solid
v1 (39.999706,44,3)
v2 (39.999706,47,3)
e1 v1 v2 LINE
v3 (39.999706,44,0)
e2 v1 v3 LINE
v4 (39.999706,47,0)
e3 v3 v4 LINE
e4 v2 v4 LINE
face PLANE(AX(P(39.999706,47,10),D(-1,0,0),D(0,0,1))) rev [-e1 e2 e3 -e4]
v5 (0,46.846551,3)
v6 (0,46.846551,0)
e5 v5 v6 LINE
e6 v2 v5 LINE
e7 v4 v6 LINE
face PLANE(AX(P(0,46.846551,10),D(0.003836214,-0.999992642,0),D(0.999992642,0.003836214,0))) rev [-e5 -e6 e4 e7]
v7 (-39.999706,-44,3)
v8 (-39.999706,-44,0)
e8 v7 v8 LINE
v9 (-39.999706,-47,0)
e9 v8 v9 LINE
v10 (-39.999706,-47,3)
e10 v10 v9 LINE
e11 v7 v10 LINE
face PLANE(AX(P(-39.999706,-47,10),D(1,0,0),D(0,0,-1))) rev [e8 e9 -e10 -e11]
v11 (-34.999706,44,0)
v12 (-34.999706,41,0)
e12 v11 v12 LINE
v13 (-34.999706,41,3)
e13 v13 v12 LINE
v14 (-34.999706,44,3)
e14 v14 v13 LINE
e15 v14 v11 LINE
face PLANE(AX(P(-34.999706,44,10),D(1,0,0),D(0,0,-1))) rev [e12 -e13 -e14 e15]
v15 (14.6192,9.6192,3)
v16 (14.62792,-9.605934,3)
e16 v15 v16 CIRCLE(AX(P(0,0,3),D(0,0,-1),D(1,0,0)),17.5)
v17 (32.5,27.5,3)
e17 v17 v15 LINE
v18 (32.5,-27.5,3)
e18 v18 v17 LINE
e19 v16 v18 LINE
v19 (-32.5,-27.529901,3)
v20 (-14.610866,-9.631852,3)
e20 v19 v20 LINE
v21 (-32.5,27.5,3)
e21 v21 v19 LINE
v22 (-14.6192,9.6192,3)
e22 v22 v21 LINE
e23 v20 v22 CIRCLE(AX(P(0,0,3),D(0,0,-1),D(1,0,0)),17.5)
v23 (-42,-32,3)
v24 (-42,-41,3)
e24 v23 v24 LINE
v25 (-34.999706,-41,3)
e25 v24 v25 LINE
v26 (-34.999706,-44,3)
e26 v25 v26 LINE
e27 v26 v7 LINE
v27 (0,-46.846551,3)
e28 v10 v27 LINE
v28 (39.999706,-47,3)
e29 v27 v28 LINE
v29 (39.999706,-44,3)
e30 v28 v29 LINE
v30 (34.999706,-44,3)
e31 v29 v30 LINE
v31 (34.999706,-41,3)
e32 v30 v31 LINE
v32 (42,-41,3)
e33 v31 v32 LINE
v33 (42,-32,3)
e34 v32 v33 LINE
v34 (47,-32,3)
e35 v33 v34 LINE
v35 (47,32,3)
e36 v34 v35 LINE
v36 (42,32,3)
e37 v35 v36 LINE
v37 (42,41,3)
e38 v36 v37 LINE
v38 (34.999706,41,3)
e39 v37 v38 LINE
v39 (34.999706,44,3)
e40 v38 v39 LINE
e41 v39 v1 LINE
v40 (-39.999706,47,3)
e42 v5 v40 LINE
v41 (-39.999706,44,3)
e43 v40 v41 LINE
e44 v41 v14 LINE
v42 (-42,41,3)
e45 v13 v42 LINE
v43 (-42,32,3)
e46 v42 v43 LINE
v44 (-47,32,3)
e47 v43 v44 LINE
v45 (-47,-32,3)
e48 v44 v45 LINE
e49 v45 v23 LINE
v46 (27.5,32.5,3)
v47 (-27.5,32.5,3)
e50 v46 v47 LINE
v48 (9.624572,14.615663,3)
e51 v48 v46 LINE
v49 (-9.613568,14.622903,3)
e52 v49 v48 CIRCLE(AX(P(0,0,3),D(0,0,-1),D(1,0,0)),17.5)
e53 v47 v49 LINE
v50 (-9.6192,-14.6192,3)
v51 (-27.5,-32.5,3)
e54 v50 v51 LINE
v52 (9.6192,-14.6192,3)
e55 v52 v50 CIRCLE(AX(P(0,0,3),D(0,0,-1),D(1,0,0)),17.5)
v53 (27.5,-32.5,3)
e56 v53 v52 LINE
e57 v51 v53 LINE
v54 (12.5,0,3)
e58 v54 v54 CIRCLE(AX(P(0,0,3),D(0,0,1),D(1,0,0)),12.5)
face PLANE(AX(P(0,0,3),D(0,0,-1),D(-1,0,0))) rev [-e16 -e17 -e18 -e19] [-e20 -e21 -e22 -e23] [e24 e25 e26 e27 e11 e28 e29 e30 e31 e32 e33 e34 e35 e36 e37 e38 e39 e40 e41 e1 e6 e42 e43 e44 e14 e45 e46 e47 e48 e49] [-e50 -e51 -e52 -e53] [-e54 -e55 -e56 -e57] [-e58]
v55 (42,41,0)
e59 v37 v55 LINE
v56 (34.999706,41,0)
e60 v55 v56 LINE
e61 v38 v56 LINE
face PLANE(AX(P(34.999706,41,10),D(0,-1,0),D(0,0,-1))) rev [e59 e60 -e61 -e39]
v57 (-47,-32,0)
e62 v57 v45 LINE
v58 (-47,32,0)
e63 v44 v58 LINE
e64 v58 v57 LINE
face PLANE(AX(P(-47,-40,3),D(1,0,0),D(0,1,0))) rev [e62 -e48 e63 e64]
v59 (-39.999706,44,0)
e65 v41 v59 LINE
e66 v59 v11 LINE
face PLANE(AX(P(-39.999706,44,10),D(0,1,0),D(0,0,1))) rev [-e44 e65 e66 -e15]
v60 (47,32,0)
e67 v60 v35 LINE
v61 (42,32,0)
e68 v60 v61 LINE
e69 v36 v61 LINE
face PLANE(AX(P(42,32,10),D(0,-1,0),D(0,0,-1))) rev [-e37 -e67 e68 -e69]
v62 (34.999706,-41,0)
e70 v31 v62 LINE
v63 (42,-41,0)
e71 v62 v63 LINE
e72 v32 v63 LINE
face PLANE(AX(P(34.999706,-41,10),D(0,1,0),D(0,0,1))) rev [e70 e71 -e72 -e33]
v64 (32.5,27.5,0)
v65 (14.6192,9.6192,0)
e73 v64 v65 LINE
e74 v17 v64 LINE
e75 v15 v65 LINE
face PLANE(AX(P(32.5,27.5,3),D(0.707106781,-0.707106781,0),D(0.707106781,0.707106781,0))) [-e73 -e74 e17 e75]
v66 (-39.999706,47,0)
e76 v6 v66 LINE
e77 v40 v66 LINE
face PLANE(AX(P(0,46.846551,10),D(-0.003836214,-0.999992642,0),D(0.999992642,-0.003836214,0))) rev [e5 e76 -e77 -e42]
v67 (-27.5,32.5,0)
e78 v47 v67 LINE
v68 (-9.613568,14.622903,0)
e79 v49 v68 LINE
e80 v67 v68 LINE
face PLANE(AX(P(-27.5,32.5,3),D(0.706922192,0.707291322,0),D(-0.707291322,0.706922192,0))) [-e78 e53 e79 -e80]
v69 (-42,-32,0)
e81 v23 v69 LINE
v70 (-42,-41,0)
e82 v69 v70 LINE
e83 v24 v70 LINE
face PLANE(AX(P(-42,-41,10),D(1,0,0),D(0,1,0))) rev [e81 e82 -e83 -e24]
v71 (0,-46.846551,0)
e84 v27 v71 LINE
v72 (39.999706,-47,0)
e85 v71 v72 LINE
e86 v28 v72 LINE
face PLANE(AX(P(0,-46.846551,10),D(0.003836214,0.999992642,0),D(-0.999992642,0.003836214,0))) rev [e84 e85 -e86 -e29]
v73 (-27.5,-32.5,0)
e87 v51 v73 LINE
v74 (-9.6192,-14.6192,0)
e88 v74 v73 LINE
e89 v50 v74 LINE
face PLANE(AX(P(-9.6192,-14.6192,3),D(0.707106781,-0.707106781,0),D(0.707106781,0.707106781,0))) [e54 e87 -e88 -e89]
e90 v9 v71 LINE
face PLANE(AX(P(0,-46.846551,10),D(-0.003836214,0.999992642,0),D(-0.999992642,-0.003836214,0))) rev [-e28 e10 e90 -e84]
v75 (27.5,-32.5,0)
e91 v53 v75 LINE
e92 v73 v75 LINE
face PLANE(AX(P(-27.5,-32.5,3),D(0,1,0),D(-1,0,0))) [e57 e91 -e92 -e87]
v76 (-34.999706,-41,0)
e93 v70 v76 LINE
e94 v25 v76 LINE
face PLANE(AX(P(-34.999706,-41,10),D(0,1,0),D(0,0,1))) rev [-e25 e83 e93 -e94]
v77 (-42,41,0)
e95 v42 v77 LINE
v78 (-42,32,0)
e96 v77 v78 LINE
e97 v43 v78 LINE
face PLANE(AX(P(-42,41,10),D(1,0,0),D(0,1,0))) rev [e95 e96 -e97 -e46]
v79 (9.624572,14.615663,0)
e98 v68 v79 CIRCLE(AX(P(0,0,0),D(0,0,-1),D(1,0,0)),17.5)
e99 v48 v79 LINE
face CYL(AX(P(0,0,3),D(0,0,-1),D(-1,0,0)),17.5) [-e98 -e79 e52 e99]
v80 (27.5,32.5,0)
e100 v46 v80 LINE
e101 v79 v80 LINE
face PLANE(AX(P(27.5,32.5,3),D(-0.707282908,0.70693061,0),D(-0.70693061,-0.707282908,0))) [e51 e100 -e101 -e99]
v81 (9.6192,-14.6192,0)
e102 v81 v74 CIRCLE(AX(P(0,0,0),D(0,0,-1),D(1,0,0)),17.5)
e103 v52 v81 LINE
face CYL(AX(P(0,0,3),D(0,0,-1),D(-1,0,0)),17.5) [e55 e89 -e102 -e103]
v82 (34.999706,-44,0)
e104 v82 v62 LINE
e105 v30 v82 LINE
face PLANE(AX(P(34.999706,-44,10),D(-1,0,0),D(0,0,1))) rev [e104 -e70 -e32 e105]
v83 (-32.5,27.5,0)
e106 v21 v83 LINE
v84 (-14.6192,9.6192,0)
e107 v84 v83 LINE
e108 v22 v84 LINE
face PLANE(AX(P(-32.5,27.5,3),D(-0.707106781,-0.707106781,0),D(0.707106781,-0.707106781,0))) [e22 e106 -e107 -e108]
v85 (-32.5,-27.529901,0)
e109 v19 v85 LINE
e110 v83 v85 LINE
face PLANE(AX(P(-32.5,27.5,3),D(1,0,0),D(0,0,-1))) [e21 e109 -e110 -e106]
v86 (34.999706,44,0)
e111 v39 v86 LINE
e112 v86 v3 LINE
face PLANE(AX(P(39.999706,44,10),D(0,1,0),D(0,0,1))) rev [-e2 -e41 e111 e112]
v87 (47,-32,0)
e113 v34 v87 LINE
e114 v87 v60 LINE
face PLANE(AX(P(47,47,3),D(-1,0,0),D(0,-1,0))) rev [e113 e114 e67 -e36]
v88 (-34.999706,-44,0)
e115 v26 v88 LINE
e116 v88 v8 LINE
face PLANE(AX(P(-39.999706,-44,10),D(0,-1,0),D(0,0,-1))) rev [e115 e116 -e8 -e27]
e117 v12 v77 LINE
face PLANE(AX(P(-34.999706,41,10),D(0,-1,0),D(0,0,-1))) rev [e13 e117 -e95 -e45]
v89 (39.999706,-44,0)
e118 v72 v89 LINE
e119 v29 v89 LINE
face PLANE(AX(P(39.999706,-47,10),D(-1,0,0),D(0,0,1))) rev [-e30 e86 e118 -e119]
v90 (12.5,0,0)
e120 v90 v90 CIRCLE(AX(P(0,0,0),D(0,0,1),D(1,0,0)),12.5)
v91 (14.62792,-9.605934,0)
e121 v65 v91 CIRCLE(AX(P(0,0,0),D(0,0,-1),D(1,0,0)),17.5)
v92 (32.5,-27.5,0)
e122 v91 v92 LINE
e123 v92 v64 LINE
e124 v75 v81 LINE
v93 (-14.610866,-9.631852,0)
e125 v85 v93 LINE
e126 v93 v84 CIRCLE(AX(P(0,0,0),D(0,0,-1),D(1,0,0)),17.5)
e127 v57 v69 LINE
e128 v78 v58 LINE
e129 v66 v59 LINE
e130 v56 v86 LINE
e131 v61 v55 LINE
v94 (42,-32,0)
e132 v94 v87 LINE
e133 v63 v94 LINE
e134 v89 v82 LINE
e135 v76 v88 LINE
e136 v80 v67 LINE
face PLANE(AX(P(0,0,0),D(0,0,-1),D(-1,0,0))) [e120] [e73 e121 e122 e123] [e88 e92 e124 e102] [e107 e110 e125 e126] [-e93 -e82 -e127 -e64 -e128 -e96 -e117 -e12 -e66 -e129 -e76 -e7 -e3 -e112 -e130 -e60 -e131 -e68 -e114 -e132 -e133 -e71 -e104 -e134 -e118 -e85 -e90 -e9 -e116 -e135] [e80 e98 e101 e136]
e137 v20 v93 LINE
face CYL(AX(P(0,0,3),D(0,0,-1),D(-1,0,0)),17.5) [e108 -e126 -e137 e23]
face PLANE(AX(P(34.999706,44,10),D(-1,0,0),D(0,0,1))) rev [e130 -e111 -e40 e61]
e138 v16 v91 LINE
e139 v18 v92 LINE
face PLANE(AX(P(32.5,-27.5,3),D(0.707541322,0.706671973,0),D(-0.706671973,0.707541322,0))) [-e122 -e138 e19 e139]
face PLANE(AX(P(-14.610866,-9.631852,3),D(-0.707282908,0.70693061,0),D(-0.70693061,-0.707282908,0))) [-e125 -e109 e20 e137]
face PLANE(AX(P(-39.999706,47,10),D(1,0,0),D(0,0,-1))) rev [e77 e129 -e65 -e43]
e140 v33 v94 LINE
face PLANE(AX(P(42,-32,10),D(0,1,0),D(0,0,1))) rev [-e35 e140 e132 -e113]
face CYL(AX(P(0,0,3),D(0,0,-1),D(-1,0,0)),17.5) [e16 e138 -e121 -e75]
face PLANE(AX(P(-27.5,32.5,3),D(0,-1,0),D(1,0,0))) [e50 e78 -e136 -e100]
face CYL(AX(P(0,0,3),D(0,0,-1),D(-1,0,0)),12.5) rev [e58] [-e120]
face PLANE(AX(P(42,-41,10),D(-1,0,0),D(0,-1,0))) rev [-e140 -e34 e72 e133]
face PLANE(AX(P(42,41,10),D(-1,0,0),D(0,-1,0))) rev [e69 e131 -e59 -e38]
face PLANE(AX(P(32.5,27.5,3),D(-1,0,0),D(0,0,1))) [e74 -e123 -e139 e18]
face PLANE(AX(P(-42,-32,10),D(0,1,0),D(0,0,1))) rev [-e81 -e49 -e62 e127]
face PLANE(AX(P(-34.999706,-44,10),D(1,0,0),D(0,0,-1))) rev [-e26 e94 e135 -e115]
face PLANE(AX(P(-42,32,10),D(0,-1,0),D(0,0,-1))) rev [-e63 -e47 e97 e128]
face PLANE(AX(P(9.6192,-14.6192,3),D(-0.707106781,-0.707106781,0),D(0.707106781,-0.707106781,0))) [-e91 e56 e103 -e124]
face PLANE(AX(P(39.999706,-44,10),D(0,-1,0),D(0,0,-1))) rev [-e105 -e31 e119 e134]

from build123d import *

# Parameters (mm, degrees)
SKETCH1_R               = 12.5
BOSS_EXTRUDE4_DEPTH     = 3
CUT_EXTRUDE_THIN3_START = -3
CUT_EXTRUDE_THIN3_DEPTH = 3


# Read off the part's stored shape, not the designer's step: Cut-Extrude-Thin3
with BuildPart() as part:
    # Sketch1 → Boss-Extrude4 (new body)
    with BuildSketch(Plane.XY):
        Polygon((-40, 47), (40, 47), (47, 47), (47, 40), (47, -40), (47, -47), (40, -47), (-40, -47), (-47, -47), (-47, -40), (-47, 40), (-47, 47), align=None)
        Circle(SKETCH1_R, mode=Mode.SUBTRACT)
        with BuildLine():
            Line((-27.5, 32.5), (27.5, 32.5))
            Line((27.5, 32.5), (9.624571705, 14.615663498))
            ThreePointArc((9.624571705, 14.615663498), (0.00658569, 17.499998761), (-9.613568497, 14.622903294))
            Line((-9.613568497, 14.622903294), (-27.5, 32.5))
        make_face(mode=Mode.SUBTRACT)
        with BuildLine():
            Line((-32.5, 27.5), (-32.5, -27.529900959))
            Line((-32.5, -27.529900959), (-14.610866481, -9.631852402))
            ThreePointArc((-14.610866481, -9.631852402), (-17.49999836, -0.007575188), (-14.619199644, 9.619199644))
            Line((-14.619199644, 9.619199644), (-32.5, 27.5))
        make_face(mode=Mode.SUBTRACT)
        with BuildLine():
            Line((-27.5, -32.5), (27.5, -32.5))
            Line((27.5, -32.5), (9.619199644, -14.619199644))
            ThreePointArc((9.619199644, -14.619199644), (0, -17.5), (-9.619199644, -14.619199644))
            Line((-9.619199644, -14.619199644), (-27.5, -32.5))
        make_face(mode=Mode.SUBTRACT)
        with BuildLine():
            Line((32.5, 27.5), (14.619199644, 9.619199644))
            ThreePointArc((14.619199644, 9.619199644), (17.4999982, 0.007937724), (14.627919862, -9.60593361))
            Line((14.627919862, -9.60593361), (32.5, -27.5))
            Line((32.5, -27.5), (32.5, 27.5))
        make_face(mode=Mode.SUBTRACT)
    extrude(amount=BOSS_EXTRUDE4_DEPTH)

    # Cut-Extrude-Thin3 outline → Cut-Extrude-Thin3 (cut)
    with BuildSketch(Plane(origin=(0, 0, 0), x_dir=(-1, 0, 0), z_dir=(0, 0, -1)).offset(CUT_EXTRUDE_THIN3_START)):
        Polygon((-42, -41), (-42, -32), (-47, -32), (-47, -47), (-39.999705668, -47), (-39.999705668, -44), (-34.999705668, -44), (-34.999705668, -41), align=None)
        Polygon((-47, 47), (-47, 32), (-42, 32), (-42, 41), (-34.999705668, 41), (-34.999705668, 44), (-39.999705668, 44), (-39.999705668, 47), align=None)
        Polygon((0, -46.846551451), (-39.999705668, -47), (39.999705668, -47), align=None)
        Polygon((39.999705668, -44), (39.999705668, -47), (47, -47), (47, -32), (42, -32), (42, -41), (34.999705668, -41), (34.999705668, -44), align=None)
        Polygon((39.999705668, 47), (-39.999705668, 47), (0, 46.846551451), align=None)
        Polygon((47, 47), (39.999705668, 47), (39.999705668, 44), (34.999705668, 44), (34.999705668, 41), (42, 41), (42, 32), (47, 32), align=None)
    extrude(amount=CUT_EXTRUDE_THIN3_DEPTH, mode=Mode.SUBTRACT)


solid = part.part
